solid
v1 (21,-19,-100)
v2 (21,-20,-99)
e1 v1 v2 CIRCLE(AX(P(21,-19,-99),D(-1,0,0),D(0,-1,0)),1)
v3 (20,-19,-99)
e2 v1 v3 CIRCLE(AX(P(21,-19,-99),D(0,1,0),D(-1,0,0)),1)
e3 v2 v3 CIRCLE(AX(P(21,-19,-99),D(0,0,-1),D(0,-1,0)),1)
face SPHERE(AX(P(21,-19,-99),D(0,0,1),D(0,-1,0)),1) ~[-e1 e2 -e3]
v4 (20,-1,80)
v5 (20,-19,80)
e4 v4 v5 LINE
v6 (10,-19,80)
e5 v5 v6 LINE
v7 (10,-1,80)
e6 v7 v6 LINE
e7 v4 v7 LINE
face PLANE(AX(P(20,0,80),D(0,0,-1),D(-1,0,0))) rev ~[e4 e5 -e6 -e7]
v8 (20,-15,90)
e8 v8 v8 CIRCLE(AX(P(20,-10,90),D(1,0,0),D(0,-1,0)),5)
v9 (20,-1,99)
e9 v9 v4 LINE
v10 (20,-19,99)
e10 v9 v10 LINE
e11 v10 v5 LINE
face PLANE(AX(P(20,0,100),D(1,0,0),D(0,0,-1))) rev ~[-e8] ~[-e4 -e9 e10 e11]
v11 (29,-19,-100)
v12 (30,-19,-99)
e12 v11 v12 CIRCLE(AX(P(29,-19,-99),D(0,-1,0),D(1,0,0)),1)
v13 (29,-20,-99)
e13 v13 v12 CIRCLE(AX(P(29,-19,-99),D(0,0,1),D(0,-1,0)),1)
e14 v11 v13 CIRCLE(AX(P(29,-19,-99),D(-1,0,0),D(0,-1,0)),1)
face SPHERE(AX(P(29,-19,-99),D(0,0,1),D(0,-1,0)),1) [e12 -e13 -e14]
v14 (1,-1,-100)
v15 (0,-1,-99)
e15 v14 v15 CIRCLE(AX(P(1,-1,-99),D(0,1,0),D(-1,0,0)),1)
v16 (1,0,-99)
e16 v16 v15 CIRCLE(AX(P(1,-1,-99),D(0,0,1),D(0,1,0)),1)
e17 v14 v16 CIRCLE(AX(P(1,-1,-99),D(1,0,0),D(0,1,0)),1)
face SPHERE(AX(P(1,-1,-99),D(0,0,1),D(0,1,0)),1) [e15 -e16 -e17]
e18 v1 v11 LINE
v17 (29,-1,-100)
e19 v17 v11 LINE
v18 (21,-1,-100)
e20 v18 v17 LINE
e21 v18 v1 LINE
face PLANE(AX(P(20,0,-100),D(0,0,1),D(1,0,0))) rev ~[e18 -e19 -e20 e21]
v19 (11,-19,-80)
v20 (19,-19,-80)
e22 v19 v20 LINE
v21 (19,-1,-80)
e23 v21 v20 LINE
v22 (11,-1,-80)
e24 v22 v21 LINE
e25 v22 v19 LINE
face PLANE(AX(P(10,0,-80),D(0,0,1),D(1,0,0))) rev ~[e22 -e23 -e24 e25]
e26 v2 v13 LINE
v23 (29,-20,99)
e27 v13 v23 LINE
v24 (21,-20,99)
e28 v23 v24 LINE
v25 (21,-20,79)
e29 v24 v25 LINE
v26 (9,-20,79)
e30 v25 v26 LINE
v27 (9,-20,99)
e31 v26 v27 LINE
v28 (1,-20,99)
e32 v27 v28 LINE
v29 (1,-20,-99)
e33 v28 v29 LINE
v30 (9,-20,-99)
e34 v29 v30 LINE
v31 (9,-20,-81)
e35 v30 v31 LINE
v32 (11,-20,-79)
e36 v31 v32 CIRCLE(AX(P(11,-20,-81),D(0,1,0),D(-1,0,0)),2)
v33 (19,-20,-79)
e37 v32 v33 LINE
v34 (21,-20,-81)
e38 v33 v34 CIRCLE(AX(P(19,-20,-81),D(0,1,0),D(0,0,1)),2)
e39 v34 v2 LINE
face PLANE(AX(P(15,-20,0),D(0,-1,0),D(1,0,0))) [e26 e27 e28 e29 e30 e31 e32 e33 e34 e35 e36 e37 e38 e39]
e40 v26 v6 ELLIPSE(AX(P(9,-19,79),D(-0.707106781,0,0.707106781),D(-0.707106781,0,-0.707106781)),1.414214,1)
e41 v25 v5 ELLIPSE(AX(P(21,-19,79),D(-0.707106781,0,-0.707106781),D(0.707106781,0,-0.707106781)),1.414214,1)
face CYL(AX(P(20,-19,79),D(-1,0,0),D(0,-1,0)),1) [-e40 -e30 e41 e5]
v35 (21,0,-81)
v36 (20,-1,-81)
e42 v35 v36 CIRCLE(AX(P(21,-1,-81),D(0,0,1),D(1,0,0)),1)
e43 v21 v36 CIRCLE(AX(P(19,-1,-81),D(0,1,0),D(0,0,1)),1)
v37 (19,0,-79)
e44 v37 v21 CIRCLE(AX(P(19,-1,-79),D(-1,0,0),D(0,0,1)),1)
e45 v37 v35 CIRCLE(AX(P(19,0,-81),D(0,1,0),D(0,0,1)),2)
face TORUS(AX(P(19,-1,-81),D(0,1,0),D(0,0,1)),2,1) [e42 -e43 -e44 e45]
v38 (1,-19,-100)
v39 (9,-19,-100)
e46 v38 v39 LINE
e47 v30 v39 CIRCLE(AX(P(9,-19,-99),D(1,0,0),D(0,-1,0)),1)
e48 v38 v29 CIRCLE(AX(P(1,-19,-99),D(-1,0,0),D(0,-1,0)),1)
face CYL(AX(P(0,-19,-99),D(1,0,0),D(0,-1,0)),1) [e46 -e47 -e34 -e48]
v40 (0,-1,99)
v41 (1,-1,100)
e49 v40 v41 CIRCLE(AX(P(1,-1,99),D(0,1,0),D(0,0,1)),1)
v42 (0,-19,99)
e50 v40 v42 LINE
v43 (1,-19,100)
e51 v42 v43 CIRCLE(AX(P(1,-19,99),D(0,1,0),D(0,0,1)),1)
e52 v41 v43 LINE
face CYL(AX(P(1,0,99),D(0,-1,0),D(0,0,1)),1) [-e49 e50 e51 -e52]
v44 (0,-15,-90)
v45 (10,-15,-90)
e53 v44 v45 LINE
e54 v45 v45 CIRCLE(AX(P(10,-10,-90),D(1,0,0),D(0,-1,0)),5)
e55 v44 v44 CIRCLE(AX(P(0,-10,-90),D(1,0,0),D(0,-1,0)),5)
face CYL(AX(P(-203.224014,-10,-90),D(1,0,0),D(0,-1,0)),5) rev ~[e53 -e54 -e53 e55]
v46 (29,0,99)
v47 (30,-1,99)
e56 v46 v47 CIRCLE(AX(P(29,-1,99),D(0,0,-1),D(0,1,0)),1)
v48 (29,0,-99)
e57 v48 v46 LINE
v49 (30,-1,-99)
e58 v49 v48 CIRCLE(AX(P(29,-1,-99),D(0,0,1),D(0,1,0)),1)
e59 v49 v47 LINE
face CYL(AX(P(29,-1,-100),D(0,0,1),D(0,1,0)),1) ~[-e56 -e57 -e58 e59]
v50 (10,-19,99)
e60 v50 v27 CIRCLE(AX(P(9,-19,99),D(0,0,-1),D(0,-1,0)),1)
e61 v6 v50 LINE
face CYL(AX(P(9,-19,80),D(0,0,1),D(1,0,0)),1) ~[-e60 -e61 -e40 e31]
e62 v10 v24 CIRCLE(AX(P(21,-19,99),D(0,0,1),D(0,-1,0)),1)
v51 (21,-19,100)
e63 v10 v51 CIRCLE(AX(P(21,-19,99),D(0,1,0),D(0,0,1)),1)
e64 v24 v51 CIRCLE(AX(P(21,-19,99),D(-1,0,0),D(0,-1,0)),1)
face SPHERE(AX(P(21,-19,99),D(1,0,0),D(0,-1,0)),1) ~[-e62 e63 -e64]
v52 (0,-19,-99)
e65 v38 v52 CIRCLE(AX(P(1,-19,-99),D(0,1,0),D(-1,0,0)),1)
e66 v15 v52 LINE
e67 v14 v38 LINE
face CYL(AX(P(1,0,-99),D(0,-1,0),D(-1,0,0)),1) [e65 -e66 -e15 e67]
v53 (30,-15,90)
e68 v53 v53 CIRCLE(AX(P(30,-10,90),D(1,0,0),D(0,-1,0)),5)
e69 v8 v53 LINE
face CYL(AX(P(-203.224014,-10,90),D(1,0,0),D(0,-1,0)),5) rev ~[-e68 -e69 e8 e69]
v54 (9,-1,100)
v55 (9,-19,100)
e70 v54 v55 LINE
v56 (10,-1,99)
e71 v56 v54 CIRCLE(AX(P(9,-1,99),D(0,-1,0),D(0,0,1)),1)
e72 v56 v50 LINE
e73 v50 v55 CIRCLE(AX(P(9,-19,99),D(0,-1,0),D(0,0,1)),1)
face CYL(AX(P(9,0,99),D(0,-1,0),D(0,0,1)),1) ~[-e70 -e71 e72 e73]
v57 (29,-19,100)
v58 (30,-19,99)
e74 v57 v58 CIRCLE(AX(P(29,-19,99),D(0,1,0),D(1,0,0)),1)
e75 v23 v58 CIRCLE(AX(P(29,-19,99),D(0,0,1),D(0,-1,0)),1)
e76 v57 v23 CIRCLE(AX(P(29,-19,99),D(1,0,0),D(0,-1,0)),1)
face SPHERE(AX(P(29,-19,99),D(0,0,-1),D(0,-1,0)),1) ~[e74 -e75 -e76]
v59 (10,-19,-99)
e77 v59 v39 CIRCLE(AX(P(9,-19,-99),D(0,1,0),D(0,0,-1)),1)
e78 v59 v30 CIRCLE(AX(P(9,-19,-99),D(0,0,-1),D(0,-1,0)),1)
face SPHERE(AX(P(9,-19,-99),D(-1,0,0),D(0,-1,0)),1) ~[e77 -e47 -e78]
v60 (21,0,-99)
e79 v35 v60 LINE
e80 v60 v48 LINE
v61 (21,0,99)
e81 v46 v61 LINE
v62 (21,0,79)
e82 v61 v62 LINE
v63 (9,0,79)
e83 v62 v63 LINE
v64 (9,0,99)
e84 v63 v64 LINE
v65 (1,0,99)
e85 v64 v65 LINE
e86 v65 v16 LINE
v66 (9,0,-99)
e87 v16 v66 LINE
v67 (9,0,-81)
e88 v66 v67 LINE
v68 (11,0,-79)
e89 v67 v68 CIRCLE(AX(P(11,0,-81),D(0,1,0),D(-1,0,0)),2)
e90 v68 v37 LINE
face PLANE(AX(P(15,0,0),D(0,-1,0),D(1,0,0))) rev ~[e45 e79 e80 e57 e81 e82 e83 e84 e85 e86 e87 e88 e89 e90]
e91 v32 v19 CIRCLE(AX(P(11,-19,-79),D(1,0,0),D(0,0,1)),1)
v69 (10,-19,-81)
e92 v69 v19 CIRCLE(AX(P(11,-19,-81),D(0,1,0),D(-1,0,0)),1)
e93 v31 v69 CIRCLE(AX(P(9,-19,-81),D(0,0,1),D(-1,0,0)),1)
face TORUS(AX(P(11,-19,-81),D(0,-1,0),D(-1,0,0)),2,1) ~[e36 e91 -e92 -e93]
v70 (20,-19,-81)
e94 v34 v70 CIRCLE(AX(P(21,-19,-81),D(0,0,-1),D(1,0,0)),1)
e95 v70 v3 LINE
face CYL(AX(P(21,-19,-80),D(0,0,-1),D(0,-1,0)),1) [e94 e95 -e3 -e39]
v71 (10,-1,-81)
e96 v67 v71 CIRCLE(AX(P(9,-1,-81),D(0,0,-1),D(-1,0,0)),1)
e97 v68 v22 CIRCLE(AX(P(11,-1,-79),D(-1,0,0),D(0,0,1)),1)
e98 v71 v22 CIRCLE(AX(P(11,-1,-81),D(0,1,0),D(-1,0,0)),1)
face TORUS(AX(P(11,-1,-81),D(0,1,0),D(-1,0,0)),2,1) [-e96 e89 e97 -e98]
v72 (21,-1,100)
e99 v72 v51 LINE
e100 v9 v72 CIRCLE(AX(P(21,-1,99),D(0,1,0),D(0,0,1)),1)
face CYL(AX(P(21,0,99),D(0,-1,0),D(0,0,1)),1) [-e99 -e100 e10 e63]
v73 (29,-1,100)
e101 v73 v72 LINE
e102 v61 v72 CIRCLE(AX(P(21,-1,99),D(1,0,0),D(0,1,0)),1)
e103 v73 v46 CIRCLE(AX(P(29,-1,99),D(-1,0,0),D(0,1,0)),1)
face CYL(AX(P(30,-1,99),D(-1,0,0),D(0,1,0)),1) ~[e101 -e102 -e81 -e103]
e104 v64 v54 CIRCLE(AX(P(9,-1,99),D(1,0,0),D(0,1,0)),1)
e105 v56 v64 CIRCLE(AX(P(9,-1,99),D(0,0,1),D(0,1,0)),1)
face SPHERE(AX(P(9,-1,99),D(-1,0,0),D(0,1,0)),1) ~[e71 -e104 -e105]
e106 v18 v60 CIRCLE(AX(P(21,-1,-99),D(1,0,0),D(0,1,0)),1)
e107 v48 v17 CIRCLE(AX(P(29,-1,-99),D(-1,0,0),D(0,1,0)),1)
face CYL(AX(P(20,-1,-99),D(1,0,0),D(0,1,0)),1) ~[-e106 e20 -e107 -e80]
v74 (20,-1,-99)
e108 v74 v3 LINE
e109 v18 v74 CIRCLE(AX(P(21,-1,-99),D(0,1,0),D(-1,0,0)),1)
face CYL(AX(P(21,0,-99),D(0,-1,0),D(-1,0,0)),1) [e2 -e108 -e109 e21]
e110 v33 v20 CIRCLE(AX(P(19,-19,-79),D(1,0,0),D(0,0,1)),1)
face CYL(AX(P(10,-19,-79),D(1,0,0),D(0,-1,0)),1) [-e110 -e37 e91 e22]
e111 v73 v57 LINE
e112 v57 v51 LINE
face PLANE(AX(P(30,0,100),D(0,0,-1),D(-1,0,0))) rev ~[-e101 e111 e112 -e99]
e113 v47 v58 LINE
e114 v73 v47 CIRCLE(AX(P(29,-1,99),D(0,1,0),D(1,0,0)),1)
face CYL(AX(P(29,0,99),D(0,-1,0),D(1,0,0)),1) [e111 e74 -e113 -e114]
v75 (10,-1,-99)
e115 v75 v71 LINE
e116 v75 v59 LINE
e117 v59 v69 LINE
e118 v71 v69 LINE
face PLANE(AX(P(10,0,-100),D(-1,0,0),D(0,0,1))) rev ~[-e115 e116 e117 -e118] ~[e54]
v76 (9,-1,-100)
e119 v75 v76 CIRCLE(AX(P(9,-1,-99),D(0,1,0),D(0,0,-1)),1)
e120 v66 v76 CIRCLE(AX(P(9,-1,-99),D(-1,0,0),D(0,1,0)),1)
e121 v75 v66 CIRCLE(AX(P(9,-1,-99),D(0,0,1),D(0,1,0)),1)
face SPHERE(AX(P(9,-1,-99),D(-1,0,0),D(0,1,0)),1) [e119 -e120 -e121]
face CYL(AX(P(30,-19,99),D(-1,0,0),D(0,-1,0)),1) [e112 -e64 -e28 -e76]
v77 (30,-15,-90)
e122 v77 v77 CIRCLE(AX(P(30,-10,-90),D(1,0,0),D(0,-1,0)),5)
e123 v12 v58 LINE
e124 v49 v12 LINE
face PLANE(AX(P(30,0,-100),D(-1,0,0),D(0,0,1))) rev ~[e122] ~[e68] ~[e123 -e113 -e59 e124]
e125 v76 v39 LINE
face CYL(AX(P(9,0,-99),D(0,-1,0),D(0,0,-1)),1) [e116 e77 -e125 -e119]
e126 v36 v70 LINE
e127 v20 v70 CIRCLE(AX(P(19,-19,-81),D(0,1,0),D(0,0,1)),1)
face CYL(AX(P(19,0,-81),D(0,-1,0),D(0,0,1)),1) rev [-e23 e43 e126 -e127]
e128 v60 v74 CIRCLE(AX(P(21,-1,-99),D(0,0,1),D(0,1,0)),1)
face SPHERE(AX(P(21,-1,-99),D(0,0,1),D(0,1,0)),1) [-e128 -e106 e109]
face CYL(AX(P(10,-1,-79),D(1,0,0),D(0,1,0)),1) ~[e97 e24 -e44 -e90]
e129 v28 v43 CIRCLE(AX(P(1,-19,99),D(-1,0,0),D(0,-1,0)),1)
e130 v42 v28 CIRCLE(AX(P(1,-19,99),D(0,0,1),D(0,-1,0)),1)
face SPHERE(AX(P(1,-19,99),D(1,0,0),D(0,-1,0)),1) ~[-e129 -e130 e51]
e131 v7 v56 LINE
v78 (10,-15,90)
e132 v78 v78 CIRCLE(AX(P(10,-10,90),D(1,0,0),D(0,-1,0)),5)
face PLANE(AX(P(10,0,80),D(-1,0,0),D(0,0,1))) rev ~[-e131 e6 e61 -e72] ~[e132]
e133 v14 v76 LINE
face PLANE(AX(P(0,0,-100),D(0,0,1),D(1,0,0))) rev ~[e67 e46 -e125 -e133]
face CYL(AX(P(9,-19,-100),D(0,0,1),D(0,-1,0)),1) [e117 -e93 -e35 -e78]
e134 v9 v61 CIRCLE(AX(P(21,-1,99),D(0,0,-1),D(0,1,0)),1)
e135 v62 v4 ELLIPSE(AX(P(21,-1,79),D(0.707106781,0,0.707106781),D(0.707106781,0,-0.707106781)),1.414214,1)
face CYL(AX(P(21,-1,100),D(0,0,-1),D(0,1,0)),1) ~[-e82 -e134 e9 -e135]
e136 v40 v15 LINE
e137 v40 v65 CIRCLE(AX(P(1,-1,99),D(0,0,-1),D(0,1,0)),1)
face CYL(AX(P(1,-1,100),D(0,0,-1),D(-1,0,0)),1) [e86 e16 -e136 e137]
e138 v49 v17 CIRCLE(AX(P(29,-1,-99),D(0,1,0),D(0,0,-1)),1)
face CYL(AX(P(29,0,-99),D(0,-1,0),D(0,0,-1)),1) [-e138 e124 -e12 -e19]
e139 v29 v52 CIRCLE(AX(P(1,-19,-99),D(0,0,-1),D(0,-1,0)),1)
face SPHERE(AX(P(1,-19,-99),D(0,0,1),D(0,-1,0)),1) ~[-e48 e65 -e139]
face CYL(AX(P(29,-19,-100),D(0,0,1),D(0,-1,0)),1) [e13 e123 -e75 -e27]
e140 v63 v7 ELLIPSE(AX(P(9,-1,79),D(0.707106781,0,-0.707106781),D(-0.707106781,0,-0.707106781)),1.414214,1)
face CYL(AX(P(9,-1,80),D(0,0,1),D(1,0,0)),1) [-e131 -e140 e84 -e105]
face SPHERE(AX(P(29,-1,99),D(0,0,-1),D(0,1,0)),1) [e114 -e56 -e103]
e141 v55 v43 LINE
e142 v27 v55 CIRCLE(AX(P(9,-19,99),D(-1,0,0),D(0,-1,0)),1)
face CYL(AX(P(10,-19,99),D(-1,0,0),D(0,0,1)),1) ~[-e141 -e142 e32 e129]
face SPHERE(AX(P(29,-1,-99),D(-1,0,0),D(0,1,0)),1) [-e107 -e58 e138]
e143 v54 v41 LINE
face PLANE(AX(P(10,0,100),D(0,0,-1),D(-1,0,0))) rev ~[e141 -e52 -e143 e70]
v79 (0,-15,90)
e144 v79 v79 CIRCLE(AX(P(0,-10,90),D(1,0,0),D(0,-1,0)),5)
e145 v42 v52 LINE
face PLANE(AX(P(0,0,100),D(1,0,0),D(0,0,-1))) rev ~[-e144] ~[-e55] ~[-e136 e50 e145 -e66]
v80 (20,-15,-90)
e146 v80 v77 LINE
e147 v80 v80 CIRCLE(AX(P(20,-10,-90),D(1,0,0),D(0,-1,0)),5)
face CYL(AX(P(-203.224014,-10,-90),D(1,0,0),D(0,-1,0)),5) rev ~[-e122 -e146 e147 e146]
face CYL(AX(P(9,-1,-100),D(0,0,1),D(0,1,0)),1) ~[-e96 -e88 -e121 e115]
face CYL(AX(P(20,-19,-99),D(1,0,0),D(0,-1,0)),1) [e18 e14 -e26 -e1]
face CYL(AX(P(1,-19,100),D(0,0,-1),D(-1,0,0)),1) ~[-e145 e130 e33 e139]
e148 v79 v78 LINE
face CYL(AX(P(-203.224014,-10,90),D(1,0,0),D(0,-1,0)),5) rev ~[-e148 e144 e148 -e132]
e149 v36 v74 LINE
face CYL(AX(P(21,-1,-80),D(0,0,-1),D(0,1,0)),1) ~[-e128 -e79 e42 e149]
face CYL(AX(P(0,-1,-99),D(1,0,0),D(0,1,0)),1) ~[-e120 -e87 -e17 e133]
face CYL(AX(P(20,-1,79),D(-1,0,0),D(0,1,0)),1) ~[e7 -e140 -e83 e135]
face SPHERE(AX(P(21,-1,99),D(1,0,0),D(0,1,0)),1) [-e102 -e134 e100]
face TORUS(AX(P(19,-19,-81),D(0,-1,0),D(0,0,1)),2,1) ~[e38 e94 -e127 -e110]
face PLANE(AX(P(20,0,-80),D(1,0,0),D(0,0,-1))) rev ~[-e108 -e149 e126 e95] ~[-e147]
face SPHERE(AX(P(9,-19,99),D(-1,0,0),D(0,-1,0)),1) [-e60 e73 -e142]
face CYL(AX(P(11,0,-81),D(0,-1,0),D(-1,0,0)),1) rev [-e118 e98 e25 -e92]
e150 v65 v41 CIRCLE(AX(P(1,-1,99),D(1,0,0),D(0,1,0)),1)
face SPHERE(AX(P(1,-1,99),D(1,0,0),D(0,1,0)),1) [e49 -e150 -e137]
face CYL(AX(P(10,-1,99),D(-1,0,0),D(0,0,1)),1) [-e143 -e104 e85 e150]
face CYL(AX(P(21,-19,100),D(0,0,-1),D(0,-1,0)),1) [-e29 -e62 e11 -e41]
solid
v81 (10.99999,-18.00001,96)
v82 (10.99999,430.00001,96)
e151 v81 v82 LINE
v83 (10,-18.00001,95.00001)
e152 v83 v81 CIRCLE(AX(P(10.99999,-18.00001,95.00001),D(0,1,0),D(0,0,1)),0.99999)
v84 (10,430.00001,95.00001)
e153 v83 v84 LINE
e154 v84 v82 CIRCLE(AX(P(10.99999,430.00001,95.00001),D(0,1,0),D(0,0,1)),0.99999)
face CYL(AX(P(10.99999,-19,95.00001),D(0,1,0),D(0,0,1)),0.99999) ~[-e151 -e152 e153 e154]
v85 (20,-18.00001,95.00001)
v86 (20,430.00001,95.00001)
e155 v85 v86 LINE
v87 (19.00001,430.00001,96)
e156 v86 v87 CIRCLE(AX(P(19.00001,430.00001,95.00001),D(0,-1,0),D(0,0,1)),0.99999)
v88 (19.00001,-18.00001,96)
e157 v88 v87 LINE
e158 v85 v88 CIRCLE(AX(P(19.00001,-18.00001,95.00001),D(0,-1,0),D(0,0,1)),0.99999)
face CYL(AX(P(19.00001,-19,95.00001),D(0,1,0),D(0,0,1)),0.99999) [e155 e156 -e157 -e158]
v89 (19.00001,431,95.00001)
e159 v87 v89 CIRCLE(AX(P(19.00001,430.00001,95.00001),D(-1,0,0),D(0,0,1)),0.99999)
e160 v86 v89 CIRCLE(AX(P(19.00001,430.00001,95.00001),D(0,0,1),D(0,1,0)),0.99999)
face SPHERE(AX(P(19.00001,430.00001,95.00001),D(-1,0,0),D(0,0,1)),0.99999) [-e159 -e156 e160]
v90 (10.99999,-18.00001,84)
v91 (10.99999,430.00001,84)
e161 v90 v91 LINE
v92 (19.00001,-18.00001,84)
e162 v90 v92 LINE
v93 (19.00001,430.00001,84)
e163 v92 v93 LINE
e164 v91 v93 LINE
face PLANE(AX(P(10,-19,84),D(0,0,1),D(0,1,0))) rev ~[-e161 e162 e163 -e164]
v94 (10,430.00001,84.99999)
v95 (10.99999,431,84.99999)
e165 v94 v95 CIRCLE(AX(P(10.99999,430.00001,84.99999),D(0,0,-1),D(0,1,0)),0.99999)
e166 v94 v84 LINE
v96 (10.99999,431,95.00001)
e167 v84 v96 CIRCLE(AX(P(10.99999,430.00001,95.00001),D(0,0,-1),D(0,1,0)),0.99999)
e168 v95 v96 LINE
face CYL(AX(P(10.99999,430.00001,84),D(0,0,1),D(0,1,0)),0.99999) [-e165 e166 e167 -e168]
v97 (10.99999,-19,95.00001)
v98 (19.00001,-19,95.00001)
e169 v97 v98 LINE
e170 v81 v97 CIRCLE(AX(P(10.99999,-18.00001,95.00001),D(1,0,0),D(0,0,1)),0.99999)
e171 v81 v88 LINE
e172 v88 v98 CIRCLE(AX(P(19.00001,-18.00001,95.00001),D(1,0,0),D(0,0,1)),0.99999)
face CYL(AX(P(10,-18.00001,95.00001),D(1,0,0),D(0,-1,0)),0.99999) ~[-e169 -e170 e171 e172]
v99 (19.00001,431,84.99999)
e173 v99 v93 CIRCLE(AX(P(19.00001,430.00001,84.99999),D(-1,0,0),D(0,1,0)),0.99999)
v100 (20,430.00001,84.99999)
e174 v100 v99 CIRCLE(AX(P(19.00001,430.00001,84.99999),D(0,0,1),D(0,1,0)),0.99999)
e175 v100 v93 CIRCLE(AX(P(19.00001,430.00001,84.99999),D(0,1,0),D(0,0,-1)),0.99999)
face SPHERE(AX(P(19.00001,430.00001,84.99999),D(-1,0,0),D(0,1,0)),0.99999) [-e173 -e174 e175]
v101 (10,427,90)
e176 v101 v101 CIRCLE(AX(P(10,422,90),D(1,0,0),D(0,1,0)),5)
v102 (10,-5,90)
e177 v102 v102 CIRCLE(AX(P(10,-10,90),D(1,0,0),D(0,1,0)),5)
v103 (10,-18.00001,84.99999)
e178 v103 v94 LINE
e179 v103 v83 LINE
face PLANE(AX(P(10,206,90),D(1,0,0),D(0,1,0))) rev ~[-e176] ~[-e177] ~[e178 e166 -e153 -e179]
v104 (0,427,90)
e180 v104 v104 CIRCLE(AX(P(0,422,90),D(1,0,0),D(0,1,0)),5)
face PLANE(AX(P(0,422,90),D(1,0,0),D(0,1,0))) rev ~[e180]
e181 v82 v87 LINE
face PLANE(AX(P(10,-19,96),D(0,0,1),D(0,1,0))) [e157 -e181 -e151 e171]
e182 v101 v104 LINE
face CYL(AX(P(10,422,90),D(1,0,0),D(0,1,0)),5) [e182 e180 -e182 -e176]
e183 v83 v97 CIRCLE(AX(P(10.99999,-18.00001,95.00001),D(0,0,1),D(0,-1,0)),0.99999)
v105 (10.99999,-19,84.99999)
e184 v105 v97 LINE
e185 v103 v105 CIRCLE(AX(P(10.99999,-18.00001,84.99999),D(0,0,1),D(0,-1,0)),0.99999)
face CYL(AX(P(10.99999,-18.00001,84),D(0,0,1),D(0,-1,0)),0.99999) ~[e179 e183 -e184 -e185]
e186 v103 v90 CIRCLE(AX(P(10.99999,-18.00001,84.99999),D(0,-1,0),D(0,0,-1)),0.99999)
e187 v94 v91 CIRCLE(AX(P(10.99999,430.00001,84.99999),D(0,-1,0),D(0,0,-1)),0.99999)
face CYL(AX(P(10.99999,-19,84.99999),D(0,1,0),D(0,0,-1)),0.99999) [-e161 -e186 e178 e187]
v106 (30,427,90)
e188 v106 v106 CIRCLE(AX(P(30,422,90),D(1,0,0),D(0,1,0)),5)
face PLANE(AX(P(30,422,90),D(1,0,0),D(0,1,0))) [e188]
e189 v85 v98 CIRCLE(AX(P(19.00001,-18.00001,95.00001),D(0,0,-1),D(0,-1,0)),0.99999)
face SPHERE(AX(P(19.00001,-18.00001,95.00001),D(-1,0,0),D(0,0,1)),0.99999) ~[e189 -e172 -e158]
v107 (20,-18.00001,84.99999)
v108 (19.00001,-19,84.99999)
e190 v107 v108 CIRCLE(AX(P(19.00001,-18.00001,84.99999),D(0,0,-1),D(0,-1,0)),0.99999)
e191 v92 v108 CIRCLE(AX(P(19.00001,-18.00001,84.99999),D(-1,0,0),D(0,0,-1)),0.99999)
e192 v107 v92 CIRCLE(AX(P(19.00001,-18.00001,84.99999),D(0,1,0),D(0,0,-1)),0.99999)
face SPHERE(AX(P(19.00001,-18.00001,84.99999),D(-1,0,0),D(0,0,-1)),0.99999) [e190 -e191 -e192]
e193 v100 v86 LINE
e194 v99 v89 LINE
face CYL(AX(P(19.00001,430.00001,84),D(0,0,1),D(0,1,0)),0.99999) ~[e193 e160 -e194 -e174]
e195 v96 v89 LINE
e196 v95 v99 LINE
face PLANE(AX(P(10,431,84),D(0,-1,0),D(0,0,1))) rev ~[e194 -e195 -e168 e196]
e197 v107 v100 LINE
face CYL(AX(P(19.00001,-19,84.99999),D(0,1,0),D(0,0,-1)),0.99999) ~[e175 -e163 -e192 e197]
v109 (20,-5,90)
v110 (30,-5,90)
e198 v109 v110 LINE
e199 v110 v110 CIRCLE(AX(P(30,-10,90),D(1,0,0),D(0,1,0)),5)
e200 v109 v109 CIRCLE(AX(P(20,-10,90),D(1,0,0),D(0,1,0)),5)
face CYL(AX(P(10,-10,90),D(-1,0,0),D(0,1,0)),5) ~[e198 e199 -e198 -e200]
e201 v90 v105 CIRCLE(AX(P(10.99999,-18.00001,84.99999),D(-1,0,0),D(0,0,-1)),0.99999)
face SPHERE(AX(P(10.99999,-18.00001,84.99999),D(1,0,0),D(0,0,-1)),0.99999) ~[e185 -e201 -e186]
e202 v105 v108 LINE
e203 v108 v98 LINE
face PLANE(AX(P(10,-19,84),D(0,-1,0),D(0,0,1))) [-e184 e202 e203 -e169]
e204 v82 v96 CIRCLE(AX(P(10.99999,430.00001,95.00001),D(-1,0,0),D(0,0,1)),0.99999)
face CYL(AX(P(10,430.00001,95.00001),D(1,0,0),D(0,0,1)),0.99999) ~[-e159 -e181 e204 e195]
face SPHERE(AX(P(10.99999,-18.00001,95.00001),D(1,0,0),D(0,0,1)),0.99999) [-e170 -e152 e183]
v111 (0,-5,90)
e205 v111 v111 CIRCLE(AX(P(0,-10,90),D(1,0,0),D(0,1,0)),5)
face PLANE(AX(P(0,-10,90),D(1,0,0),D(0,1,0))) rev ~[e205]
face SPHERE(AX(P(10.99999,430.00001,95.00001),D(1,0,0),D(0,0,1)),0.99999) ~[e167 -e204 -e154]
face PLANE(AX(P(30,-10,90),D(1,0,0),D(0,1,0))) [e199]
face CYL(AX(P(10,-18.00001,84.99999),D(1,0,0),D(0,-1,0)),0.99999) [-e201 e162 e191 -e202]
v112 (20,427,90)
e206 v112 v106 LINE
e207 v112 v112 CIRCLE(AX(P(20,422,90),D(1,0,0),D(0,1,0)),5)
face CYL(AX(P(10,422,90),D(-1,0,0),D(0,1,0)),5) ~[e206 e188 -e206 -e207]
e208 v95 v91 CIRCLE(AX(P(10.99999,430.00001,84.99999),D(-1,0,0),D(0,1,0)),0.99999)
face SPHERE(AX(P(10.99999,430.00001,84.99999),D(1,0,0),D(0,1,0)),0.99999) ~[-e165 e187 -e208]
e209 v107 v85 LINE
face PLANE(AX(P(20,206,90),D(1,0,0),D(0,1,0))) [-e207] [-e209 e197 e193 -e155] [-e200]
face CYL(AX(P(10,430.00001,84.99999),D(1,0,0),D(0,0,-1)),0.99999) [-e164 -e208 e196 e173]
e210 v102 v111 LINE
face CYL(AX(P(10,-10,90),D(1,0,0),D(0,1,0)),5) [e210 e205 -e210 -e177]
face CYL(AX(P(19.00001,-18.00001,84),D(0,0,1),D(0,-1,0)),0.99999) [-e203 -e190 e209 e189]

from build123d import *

# Parameters (mm, degrees)
F1_DEPTH      = 20
F3_D          = 10
F4_R          = 1
F5_W          = 450
F5_H          = 12
F5_R          = 5
F6_DEPTH      = 10
F7_R          = 0.99999
F8_DEPTH      = 20
F8_DEPTH_BACK = 10


# Not quite as in the source:
# - a fillet or chamfer is up to 0.001 mm smaller than in the source, because OpenCascade refuses the exact size


with BuildPart() as f1:
    # F0 (on Front) → F1 (new body)
    with BuildSketch(Plane.XZ):
        Polygon((10, 100), (0, 100), (0, 0), (0, -100), (10, -100), (10, -80), (20, -80), (20, -100), (30, -100), (30, 0), (30, 100), (20, 100), (20, 80), (10, 80), align=None)
    extrude(amount=F1_DEPTH)

    # F3 (through all)
    with Locations(Plane(origin=(0, 0, 0), x_dir=(0, 1, 0), z_dir=(-1, 0, 0))):
        with Locations((-10, -90), (-10, 90)):
            Hole(F3_D / 2)

    # F4
    f4_edges = [f1.edges().sort_by_distance(p)[0] for p in [
        (5, 0, 100),
        (0, 0, 0),
        (5, 0, -100),
        (10, 0, -90),
        (15, 0, -80),
        (20, 0, -90),
        (25, 0, -100),
        (30, 0, 0),
        (25, 0, 100),
        (20, 0, 90),
        (15, 0, 80),
        (10, 0, 90),
        (30, -20, 0),
        (5, -20, 100),
        (0, -20, 0),
        (5, -20, -100),
        (10, -20, -90),
        (15, -20, -80),
        (20, -20, -90),
        (25, -20, -100),
        (25, -20, 100),
        (20, -20, 90),
        (15, -20, 80),
        (10, -20, 90),
        (30, -10, 100),
        (20, -10, 100),
        (10, -10, 100),
        (0, -10, 100),
        (20, -10, -100),
        (30, -10, -100),
        (0, -10, -100),
        (10, -10, -100),
        (10, -10, -80),
        (20, -10, -80),
    ]]
    fillet(f4_edges, radius=F4_R)


with BuildPart() as f6:
    # F5 (on face) → F6 (new body, through all)
    with BuildSketch(Plane.YZ.offset(10)):
        with Locations((206, 90)):
            Rectangle(F5_W, F5_H)
        with Locations((-10, 90)):
            Circle(F5_R, mode=Mode.SUBTRACT)
        with Locations((422, 90)):
            Circle(F5_R, mode=Mode.SUBTRACT)
    extrude(amount=F6_DEPTH)

    # F7 (radius 1 in the source; OpenCascade refuses exactly that, so slightly less here)
    f7_edges = [f6.edges().sort_by_distance(p)[0] for p in [
        (15, 431, 96),
        (15, -19, 96),
        (10, 206, 96),
        (20, 206, 96),
        (15, 431, 84),
        (10, 431, 90),
        (20, 431, 90),
        (15, -19, 84),
        (10, 206, 84),
        (20, 206, 84),
        (10, -19, 90),
        (20, -19, 90),
    ]]
    fillet(f7_edges, radius=F7_R)

    # F5 (on face) → F8 (join, two sides)
    with BuildSketch(Plane.YZ.offset(10)) as f8_sk:
        with Locations((-10, 90)):
            Circle(F5_R)
        with Locations((422, 90)):
            Circle(F5_R)
    extrude(amount=F8_DEPTH)
    extrude(f8_sk.sketch, amount=-F8_DEPTH_BACK)


solid = Compound([f1.part, f6.part])
